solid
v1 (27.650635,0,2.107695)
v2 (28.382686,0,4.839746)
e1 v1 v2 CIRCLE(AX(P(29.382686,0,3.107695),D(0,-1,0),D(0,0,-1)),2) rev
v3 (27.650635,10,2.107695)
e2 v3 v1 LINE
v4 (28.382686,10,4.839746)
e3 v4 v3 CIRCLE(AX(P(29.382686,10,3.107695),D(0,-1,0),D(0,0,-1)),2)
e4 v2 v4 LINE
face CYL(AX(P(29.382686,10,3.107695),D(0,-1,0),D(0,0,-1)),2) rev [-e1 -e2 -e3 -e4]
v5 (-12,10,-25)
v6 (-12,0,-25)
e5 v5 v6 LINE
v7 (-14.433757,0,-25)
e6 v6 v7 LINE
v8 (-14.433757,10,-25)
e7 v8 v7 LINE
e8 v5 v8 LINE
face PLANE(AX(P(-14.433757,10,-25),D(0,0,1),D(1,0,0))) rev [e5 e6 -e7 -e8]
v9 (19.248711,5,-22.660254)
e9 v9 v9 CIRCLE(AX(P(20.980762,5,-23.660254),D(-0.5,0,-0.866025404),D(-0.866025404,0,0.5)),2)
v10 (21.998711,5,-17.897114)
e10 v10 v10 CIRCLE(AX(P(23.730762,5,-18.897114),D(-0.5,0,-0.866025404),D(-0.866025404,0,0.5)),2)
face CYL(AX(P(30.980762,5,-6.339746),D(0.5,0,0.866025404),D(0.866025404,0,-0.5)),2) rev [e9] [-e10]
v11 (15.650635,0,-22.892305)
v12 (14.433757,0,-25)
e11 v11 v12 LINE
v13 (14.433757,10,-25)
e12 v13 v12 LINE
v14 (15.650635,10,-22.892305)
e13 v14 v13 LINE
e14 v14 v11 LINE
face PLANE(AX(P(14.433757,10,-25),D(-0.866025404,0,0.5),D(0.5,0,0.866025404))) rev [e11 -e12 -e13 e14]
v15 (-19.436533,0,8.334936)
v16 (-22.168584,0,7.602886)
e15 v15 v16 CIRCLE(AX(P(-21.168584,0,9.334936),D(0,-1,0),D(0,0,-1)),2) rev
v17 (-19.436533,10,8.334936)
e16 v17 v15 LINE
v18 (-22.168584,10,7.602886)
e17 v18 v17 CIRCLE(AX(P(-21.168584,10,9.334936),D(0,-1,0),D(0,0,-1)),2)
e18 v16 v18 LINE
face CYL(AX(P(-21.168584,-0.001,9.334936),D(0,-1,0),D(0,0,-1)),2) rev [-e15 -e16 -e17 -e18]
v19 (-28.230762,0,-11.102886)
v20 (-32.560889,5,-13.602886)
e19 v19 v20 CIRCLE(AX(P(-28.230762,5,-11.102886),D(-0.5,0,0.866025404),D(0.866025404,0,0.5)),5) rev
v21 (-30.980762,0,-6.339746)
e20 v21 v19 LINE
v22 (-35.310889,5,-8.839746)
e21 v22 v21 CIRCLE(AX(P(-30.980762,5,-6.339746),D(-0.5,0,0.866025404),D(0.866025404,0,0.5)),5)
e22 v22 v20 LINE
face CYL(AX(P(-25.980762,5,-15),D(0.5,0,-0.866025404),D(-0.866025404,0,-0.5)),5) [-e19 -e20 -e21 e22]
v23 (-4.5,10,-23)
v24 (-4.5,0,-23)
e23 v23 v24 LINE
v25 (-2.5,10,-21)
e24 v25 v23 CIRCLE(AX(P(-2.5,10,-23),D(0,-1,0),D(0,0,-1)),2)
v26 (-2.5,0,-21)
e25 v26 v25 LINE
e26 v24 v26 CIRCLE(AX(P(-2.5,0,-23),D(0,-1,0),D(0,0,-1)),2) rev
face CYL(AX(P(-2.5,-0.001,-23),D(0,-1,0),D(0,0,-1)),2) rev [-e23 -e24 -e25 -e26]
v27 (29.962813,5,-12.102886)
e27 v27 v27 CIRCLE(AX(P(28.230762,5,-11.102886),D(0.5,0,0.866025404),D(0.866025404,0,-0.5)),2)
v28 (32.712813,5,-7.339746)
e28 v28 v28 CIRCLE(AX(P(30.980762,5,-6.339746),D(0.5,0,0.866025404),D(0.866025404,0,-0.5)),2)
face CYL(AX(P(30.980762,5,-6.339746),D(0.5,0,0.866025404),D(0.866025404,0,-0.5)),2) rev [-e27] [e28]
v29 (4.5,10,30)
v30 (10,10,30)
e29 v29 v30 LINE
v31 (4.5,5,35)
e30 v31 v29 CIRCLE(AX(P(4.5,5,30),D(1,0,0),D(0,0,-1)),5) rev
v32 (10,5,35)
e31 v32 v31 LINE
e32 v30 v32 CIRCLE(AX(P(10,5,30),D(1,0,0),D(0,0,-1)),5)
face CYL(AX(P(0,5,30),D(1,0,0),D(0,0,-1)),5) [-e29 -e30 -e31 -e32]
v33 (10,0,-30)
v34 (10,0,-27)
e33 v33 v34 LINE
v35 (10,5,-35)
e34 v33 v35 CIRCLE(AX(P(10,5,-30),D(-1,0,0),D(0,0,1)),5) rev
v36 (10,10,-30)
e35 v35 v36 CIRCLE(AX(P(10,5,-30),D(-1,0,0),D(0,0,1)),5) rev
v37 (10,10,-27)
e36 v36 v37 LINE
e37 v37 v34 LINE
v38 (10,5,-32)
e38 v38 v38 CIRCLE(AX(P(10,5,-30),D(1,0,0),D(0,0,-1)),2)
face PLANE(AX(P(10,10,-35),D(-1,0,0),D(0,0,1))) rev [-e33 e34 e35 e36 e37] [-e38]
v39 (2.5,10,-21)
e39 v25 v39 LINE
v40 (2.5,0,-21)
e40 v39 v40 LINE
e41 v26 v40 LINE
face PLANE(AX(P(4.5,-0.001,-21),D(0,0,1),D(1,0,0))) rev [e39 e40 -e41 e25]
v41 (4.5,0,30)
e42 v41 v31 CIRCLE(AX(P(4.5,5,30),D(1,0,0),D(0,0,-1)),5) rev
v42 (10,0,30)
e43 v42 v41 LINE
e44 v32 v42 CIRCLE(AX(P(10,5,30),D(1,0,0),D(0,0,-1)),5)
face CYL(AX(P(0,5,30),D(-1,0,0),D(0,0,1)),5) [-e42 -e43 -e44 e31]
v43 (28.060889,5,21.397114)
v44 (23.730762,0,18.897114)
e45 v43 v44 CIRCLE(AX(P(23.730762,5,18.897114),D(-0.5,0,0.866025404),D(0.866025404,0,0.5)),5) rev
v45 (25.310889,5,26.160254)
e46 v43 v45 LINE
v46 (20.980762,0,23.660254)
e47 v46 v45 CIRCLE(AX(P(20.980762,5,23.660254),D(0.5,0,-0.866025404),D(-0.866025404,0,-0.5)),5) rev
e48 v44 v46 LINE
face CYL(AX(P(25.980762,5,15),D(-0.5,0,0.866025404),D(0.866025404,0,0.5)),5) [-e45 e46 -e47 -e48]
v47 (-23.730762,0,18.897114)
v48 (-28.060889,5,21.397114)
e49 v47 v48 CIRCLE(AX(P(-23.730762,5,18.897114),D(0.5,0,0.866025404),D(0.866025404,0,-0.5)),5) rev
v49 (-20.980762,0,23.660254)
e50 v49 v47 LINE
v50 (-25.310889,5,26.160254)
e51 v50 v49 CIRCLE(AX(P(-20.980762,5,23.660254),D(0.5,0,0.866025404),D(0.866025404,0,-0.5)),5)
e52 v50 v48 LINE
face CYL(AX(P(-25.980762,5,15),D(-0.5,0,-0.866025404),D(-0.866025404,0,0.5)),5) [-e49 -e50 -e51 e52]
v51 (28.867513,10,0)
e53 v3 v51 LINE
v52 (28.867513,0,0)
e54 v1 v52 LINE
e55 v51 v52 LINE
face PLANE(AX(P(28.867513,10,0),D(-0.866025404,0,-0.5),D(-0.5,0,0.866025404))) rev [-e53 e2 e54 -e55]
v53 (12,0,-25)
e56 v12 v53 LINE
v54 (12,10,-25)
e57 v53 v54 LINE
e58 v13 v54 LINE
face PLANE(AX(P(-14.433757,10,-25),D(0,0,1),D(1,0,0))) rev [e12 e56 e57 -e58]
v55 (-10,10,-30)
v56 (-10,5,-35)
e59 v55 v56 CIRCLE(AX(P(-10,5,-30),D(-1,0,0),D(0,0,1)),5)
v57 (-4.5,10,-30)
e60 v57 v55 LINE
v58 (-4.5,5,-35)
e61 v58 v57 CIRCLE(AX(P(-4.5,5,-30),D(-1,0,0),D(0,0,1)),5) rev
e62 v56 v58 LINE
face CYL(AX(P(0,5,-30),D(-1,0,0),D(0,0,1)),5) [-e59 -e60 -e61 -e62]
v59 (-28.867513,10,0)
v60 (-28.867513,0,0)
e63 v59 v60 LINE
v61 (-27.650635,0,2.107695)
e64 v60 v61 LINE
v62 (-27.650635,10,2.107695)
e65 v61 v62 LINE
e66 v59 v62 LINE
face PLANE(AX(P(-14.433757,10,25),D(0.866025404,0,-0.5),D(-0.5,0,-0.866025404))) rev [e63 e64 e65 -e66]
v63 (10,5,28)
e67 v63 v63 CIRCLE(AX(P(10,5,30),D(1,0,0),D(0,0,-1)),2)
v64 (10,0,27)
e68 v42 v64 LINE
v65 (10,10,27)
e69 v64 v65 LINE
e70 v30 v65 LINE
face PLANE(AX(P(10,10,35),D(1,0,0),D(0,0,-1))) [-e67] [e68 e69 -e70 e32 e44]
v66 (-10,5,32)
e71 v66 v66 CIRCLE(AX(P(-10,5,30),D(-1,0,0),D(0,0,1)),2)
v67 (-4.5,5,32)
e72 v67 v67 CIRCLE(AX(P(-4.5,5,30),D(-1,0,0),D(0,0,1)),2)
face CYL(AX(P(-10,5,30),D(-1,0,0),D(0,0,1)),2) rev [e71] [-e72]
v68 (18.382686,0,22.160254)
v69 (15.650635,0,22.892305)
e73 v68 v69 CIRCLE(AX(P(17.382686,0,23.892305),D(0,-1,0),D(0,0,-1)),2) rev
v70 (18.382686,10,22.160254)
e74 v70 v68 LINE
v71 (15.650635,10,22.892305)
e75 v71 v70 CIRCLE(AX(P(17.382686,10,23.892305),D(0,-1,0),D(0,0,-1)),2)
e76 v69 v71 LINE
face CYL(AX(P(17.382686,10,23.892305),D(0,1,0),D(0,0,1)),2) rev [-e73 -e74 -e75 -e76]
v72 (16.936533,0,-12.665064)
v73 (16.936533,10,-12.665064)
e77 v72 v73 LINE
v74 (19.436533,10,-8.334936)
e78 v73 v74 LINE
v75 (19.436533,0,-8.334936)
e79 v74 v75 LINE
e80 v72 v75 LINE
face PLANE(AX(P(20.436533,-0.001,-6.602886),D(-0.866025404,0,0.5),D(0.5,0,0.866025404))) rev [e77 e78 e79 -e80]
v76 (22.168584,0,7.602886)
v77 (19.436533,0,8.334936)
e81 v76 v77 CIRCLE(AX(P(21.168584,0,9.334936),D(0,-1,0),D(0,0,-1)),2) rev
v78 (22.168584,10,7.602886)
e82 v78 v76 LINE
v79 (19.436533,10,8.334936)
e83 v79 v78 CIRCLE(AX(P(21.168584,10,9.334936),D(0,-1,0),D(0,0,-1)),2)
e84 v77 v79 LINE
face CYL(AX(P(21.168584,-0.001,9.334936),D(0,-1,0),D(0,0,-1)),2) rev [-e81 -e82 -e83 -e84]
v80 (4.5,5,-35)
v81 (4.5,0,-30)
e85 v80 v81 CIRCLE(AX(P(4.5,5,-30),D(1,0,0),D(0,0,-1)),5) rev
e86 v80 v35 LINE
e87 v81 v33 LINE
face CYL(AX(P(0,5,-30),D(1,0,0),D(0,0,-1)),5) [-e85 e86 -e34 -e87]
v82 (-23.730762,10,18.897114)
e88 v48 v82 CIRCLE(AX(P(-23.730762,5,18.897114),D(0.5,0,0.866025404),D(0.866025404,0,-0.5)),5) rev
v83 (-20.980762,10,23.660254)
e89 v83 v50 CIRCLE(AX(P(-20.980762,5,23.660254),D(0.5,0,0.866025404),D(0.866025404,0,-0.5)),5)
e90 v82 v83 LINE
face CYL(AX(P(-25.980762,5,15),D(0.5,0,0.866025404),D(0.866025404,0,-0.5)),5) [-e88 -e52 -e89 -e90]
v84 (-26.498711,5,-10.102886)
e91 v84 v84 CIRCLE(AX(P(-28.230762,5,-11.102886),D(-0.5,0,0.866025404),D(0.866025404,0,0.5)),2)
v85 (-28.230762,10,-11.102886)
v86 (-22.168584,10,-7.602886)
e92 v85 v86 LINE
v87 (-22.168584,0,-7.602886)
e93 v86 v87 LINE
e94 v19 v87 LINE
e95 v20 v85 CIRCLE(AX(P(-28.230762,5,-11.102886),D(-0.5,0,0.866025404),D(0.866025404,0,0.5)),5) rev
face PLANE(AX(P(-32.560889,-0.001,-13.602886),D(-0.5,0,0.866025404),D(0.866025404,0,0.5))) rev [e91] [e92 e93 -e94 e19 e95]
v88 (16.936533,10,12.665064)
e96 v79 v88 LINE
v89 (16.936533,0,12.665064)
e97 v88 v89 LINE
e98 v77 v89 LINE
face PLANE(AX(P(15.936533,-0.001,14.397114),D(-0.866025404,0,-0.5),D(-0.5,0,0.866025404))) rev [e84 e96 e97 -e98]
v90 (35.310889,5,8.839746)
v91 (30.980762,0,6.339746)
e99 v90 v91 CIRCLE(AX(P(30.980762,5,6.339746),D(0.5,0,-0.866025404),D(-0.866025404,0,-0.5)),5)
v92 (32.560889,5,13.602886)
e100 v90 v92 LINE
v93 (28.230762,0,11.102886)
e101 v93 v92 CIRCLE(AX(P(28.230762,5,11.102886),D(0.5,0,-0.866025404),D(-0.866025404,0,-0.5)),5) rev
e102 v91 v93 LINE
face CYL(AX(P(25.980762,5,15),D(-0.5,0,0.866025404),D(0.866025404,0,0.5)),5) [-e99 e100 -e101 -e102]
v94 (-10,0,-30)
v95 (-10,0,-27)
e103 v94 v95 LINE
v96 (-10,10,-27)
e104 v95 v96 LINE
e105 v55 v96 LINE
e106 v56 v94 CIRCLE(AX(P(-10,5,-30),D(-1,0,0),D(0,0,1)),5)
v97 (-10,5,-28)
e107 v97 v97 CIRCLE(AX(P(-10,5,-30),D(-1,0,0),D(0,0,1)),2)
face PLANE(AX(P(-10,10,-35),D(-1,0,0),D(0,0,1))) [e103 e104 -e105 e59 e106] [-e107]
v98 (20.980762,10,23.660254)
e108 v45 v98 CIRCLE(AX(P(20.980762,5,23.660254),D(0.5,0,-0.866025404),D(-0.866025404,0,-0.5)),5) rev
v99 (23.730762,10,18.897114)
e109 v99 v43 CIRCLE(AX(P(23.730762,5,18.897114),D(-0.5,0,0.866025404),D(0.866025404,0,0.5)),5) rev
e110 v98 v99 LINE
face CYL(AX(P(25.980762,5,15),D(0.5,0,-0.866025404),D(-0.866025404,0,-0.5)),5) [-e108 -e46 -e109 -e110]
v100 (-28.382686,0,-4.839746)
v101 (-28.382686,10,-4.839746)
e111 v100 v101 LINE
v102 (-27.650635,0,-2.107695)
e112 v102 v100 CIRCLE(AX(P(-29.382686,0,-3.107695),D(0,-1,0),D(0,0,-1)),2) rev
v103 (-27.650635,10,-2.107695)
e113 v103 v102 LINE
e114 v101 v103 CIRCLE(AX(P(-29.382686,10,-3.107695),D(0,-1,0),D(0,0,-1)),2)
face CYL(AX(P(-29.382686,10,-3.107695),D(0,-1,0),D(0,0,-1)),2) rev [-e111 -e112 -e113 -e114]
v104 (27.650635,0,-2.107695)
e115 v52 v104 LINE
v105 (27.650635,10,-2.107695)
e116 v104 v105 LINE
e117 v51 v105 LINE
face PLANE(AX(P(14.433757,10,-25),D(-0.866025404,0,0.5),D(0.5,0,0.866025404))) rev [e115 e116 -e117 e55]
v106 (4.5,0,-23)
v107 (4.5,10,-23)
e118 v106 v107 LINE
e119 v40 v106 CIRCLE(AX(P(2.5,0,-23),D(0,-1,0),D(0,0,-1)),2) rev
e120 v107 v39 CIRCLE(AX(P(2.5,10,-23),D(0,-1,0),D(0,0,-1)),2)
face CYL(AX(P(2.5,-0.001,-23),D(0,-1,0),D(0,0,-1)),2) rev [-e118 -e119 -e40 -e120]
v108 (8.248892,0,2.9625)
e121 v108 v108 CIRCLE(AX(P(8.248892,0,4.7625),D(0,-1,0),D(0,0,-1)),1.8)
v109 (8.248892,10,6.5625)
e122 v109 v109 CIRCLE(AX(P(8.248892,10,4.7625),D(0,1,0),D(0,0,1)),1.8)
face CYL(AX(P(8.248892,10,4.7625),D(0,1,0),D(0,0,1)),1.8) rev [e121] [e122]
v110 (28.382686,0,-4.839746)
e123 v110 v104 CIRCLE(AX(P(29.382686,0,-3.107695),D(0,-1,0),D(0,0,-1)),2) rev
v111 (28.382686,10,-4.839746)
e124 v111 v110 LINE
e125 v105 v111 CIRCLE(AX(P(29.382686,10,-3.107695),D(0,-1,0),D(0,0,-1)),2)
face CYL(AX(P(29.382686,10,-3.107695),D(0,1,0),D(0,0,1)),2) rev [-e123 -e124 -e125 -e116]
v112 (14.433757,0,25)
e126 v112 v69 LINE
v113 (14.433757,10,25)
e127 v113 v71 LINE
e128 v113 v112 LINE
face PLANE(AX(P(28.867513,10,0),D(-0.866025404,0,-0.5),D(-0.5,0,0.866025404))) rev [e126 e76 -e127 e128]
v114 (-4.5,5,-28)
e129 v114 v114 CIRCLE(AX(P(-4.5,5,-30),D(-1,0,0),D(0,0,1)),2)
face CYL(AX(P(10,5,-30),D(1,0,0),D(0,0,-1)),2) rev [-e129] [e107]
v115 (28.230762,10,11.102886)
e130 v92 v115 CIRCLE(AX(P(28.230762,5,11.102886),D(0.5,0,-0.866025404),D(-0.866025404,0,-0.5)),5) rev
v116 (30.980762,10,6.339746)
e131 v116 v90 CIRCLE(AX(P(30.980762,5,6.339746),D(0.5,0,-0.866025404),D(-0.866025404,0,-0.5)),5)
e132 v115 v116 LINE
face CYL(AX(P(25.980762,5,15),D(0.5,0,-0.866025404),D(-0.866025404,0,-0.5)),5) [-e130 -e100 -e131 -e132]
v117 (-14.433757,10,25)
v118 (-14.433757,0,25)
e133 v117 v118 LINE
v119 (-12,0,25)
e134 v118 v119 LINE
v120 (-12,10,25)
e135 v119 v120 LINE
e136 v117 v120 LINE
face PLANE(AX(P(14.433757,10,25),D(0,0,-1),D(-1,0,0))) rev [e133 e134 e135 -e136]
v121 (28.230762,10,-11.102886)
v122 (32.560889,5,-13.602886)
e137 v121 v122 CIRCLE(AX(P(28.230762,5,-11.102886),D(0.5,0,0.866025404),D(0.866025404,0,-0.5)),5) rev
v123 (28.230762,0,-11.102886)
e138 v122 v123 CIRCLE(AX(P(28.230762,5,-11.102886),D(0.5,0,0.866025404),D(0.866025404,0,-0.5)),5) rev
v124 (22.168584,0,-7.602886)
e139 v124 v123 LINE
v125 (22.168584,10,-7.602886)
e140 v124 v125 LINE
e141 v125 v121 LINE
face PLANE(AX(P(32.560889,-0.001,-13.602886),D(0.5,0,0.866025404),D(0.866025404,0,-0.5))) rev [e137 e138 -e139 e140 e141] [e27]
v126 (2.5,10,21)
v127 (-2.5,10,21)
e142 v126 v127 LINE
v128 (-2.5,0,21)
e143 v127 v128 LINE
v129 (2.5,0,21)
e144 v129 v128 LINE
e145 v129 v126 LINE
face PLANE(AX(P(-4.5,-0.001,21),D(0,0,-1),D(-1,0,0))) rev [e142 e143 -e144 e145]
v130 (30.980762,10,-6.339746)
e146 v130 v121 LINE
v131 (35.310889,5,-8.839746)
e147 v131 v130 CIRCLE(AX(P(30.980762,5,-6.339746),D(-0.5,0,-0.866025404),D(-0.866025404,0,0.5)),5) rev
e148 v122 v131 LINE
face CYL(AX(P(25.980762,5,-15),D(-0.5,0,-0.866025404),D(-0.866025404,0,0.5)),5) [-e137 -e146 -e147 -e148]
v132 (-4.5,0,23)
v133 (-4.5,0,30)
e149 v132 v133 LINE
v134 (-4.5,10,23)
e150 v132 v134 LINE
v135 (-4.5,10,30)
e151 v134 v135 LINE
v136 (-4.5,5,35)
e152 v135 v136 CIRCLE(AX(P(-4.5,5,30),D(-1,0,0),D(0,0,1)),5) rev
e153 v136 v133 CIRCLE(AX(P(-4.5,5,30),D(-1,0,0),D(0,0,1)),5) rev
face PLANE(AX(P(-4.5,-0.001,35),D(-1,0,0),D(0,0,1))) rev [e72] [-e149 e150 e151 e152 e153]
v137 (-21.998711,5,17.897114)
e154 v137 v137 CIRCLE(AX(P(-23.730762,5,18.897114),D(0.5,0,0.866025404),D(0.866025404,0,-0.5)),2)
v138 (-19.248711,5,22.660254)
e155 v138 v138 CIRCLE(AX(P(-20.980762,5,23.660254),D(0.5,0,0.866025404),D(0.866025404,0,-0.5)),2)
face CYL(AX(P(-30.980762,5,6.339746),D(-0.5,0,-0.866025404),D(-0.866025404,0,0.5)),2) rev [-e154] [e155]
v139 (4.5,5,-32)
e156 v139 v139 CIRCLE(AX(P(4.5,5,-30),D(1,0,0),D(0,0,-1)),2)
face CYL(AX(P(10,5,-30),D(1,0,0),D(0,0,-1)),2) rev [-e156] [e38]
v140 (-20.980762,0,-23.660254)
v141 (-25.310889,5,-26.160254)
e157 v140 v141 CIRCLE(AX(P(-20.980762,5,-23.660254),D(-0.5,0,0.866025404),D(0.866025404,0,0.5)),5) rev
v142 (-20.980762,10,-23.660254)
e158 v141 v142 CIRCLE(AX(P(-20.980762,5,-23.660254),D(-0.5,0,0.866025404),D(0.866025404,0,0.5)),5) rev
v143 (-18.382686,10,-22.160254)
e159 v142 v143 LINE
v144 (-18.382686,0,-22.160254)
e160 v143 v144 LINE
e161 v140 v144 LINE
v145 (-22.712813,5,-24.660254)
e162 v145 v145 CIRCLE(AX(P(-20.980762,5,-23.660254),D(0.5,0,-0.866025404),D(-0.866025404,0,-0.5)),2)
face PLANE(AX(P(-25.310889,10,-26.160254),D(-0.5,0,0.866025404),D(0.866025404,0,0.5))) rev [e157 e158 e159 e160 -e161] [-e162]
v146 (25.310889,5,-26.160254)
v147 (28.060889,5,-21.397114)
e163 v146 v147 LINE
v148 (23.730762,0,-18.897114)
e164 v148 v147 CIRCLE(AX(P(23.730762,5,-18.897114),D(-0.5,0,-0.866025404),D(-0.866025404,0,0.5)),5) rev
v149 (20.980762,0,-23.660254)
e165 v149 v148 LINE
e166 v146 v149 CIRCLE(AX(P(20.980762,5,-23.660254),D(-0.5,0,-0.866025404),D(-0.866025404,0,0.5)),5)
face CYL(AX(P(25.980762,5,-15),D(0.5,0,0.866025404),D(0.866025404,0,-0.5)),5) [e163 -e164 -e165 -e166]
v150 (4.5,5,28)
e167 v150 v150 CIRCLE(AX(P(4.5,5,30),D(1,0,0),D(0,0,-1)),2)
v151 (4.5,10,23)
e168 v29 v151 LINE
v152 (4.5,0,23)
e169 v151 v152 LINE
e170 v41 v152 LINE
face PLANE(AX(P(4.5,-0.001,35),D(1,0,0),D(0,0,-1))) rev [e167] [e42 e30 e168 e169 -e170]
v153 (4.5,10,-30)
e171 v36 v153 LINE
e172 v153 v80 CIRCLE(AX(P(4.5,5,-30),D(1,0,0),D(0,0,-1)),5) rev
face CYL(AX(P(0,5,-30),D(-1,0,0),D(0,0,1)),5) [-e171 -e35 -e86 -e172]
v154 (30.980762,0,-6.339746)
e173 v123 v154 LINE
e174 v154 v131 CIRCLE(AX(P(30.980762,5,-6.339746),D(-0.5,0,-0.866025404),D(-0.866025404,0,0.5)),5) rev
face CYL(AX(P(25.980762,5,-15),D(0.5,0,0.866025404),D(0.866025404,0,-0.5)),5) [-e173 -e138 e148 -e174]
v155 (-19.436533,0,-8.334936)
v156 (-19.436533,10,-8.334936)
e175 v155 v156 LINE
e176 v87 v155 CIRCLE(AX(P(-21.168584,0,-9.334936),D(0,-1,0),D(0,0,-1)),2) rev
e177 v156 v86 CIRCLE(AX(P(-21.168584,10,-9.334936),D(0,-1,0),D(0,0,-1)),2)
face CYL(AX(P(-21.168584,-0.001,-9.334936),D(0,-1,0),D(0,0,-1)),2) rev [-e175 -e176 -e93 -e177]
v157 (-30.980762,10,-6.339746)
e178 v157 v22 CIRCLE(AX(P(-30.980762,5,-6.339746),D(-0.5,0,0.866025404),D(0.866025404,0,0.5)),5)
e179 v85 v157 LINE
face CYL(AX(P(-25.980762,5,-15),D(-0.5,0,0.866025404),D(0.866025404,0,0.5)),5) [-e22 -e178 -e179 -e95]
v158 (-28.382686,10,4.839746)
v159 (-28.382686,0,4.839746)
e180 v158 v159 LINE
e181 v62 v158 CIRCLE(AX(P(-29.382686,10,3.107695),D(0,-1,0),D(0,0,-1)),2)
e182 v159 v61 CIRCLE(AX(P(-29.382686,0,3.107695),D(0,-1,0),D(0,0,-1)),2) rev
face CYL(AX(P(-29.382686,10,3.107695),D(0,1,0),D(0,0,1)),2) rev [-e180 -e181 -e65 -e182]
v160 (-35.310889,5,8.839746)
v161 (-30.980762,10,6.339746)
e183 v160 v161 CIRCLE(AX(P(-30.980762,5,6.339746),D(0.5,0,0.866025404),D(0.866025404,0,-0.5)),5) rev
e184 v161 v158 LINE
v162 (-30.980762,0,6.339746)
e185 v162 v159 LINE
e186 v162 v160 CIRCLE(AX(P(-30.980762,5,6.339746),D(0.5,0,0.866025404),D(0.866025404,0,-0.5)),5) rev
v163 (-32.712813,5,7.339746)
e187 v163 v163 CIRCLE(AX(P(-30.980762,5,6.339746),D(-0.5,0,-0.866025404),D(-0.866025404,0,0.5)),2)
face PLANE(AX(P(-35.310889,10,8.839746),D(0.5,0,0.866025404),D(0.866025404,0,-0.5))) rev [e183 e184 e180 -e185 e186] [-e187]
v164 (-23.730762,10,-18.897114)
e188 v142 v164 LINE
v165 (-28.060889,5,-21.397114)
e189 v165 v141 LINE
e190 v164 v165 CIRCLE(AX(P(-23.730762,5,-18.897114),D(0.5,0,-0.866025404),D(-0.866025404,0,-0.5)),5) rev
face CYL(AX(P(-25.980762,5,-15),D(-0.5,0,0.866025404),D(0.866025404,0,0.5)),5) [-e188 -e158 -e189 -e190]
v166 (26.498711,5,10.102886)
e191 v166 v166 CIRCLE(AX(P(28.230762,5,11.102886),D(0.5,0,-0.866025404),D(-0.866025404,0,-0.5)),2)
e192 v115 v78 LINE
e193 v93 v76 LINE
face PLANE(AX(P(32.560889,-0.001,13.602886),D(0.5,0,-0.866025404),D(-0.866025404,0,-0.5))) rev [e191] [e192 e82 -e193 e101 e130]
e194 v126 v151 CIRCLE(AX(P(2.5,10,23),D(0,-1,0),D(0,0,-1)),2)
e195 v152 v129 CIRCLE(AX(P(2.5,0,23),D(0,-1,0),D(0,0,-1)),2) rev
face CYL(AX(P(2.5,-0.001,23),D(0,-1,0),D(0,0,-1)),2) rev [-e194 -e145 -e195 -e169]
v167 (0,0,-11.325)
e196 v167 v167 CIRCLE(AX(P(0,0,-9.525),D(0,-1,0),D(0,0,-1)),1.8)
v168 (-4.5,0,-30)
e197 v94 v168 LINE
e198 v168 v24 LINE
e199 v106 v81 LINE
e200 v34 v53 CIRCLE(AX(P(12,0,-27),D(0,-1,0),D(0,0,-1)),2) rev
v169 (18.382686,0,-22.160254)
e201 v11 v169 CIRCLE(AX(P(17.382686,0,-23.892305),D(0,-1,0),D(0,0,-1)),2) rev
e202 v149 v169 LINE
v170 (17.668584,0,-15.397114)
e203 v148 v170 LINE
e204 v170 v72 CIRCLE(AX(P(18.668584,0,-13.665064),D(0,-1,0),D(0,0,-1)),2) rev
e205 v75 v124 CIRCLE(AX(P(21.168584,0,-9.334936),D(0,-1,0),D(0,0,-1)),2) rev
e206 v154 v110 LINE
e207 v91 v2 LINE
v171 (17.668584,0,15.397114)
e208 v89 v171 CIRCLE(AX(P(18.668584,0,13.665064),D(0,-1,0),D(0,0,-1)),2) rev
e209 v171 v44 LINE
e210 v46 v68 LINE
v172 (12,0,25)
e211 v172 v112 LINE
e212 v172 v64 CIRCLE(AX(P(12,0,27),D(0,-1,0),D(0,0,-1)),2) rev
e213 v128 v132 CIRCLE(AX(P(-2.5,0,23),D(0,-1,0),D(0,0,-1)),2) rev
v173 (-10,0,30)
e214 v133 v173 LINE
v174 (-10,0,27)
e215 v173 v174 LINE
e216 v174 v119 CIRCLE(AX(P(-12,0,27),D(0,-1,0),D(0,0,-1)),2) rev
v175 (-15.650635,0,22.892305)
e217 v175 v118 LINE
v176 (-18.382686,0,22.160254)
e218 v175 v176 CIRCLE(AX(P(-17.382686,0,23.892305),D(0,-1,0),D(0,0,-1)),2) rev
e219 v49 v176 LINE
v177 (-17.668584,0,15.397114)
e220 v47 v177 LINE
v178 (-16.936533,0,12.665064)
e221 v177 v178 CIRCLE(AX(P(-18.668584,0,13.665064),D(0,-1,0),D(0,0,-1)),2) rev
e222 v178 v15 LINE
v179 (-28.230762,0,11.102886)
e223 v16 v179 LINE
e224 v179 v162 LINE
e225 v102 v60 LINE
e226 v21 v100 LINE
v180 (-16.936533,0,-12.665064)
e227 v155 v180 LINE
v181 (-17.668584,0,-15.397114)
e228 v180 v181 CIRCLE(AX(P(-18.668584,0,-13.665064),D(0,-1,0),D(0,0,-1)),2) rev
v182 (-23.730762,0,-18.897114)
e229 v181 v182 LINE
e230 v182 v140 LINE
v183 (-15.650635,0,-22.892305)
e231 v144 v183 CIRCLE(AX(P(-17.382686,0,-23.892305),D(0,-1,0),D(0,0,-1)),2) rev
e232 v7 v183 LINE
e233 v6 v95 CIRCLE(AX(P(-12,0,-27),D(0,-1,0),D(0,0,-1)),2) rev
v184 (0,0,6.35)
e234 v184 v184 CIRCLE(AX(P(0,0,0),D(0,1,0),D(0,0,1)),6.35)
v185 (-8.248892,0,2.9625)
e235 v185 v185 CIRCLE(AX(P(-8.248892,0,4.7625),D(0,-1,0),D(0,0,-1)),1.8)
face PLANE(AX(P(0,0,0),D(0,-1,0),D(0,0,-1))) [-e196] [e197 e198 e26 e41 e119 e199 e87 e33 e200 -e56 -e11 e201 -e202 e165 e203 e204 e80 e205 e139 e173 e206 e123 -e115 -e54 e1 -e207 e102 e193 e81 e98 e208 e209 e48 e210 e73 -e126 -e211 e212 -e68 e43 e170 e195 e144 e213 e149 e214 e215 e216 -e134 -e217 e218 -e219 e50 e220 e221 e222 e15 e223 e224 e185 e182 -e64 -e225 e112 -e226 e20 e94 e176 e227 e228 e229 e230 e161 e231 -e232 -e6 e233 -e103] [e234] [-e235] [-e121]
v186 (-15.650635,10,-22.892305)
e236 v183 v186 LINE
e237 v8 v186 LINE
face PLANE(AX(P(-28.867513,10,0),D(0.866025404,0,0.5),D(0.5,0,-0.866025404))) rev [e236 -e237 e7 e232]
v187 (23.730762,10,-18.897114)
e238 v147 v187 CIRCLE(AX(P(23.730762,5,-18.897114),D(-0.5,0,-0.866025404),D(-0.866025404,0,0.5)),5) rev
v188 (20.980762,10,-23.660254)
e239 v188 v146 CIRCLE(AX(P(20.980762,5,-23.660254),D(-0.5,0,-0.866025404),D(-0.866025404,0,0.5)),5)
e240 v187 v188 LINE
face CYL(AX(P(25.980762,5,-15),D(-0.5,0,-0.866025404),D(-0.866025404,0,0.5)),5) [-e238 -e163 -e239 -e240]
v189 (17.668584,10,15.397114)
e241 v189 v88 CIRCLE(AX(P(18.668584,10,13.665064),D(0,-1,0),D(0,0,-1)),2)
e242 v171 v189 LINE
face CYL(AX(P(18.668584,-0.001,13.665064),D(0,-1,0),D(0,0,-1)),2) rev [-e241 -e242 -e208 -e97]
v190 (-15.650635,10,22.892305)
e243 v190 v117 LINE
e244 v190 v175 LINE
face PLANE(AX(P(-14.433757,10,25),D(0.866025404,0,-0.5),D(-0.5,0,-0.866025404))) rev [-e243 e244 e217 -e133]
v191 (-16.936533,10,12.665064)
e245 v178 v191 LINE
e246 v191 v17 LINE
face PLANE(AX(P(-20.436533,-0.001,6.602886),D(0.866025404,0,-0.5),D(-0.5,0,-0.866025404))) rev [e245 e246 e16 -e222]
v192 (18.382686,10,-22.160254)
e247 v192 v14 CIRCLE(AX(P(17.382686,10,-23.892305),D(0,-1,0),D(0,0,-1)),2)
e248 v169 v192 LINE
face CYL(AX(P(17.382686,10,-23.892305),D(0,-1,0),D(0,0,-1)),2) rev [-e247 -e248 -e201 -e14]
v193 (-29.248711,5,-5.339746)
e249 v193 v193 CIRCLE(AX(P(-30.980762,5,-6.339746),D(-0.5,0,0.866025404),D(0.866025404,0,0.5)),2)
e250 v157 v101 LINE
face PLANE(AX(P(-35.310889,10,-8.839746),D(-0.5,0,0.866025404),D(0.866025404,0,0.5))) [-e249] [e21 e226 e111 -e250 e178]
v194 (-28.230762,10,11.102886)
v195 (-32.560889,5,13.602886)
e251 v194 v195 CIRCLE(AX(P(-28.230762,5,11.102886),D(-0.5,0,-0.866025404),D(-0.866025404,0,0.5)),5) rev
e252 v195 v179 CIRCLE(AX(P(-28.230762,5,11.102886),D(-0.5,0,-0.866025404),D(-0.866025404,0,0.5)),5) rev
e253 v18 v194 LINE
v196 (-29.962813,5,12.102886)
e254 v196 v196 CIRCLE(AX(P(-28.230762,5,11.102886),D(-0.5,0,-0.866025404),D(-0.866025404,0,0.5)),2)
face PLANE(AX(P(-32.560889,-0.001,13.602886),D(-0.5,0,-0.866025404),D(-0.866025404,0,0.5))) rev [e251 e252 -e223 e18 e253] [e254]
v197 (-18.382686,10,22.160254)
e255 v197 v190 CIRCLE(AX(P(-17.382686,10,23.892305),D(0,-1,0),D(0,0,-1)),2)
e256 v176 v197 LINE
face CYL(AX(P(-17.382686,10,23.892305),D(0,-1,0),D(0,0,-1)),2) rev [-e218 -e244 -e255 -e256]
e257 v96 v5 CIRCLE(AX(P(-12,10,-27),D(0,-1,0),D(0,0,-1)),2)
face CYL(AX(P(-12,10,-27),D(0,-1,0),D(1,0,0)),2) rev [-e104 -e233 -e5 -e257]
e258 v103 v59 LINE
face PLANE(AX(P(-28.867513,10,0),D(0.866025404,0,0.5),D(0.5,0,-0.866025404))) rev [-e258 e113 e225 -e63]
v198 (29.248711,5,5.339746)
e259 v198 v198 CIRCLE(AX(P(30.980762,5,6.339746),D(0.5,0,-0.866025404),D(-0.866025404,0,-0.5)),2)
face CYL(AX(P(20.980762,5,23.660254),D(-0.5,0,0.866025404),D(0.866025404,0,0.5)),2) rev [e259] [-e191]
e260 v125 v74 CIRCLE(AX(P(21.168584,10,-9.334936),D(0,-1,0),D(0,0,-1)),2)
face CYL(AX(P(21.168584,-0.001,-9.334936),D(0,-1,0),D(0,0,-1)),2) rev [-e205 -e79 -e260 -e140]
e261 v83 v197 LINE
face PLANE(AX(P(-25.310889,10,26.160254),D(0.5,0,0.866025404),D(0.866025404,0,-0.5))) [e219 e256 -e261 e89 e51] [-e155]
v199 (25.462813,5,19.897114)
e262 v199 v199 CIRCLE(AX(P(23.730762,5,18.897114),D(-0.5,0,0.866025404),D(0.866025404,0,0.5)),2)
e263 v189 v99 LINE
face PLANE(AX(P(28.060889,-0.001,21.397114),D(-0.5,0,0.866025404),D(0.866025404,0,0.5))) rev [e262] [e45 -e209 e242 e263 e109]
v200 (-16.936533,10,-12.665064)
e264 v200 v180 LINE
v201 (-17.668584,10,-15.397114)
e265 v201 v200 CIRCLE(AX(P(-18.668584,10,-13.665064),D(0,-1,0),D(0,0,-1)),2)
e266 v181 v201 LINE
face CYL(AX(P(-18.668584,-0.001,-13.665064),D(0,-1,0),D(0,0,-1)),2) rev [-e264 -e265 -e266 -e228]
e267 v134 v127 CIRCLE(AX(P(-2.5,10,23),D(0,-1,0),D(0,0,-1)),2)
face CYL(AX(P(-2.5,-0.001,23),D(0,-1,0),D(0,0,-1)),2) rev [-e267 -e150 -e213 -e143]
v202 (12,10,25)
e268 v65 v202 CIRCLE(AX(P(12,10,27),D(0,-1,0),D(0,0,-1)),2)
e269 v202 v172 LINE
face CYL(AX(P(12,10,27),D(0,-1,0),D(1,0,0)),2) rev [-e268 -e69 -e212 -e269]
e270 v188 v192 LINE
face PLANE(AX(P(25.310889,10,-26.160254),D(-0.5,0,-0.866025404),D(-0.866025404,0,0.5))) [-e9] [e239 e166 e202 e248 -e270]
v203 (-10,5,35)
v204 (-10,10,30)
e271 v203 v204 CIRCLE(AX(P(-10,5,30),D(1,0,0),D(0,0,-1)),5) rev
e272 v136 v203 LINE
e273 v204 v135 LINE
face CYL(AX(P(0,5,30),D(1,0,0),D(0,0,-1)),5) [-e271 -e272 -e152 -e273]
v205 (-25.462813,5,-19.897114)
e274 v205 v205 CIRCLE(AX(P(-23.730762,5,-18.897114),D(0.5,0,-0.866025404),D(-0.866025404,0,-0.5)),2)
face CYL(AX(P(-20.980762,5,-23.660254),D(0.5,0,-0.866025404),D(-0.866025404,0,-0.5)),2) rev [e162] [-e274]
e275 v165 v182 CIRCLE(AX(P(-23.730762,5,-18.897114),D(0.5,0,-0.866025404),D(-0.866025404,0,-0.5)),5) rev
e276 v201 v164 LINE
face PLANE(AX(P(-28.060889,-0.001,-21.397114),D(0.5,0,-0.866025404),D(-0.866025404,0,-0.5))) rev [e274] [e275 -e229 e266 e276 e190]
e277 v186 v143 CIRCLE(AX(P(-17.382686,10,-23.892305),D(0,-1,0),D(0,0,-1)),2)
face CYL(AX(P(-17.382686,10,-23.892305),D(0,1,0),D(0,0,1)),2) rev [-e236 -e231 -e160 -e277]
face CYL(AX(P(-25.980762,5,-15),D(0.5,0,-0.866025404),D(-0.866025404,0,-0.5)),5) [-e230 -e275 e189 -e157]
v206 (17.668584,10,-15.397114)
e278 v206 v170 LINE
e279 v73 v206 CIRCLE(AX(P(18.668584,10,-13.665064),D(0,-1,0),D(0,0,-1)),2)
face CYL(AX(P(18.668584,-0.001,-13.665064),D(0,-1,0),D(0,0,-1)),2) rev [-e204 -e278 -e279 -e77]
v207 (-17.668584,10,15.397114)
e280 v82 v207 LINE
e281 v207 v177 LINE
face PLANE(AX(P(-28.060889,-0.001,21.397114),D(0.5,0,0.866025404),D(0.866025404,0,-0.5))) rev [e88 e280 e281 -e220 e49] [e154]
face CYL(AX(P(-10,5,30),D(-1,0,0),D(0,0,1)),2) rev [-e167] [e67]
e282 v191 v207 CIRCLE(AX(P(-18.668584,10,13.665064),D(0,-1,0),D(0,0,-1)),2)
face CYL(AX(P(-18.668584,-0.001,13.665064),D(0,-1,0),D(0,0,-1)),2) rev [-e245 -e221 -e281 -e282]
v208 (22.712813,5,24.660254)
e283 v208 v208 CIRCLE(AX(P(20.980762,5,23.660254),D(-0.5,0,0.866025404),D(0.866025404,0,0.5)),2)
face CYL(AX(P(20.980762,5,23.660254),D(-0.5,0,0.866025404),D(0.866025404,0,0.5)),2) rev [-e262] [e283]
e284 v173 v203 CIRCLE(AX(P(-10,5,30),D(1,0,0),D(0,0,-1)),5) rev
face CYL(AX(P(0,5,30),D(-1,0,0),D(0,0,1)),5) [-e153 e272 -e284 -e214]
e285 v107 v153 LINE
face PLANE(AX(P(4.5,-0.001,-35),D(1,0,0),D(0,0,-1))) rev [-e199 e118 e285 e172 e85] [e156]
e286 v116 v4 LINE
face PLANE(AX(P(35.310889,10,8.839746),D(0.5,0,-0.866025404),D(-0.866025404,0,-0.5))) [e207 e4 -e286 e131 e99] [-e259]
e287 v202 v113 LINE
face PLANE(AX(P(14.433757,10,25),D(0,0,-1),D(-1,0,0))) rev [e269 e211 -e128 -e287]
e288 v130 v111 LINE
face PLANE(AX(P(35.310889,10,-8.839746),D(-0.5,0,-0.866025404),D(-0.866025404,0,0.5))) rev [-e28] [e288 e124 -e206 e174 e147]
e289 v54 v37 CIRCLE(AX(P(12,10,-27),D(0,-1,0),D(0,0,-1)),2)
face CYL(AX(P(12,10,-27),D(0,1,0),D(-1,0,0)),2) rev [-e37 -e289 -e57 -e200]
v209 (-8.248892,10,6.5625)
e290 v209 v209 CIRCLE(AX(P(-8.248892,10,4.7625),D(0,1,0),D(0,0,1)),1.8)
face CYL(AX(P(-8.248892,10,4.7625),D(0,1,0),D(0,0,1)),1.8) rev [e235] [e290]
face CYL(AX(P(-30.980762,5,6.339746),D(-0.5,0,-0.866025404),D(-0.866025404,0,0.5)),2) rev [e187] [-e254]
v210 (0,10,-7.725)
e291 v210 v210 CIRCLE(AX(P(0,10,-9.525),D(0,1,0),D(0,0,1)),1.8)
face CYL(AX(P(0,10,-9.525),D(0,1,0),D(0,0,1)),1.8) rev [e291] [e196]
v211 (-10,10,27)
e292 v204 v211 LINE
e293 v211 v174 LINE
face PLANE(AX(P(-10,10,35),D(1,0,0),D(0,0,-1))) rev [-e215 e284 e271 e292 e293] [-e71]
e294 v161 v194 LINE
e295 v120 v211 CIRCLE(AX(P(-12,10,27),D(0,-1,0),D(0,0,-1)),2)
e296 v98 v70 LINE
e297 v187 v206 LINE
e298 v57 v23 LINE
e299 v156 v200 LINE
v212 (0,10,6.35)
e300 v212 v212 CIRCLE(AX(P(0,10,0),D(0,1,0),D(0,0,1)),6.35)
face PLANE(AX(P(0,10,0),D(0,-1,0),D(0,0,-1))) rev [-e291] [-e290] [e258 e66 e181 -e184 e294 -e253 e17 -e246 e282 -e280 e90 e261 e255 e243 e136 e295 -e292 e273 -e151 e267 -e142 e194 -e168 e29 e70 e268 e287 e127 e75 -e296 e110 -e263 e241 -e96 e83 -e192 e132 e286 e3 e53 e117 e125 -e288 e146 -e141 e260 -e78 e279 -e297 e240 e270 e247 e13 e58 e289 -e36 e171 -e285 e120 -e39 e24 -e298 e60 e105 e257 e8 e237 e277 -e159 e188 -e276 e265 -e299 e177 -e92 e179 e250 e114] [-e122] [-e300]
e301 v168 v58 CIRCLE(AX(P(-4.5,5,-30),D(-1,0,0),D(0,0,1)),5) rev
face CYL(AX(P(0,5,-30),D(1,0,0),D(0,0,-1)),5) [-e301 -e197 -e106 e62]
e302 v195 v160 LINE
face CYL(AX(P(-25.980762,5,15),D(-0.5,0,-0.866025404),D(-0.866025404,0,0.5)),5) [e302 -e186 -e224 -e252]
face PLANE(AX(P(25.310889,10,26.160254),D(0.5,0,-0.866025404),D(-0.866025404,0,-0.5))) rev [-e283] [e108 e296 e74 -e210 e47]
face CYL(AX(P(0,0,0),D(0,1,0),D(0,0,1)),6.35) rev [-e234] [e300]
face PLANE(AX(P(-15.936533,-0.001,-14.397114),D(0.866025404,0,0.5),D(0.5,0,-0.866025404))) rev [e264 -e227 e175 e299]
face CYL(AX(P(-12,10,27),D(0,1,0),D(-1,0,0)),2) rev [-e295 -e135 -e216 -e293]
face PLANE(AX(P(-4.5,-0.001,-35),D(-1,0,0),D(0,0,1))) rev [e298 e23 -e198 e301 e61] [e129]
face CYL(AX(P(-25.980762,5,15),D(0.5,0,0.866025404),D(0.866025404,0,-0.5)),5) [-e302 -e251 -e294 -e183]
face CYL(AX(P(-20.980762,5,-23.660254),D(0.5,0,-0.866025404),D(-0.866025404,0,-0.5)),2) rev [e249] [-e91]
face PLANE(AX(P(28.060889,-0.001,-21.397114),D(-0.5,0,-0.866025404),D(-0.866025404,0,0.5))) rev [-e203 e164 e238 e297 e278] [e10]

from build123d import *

# Parameters (mm, degrees)
BOSS_EXTRUDE1_DEPTH      = 10
BOSS_EXTRUDE2_DEPTH      = 10
CUT_EXTRUDE1_REACH       = 47.069
FILLET1_R                = 5
F_4_0_MM_DOWEL_HOLES1_D  = 4
CIRPATTERN5_COUNT        = 6
FILLET1_OF_CIRPATTERN5_R = 5
FILLET2_R                = 2
SKETCH6_R                = 6.35
CUT_EXTRUDE2_DEPTH       = 51.71349811760731
M3_CLEARANCE_HOLE1_D     = 3.6
CIRPATTERN6_COUNT        = 3


with BuildPart() as part:
    # Sketch1 → Boss-Extrude1 (new body)
    with BuildSketch(Plane(origin=(0, 0, 0), x_dir=(1, 0, 0), z_dir=(0, 1, 0))):
        Polygon((-28.867513459481238, 4.38e-15), (-14.43375672974066, 25.000000000000057), (14.433756729740656, 25.000000000000057), (28.867513459481245, 6.61e-15), (14.433756729740656, -25.00000000000005), (-14.433756729740653, -25.00000000000005), align=None)
    extrude(amount=BOSS_EXTRUDE1_DEPTH)

    # Sketch2 → Boss-Extrude2 (add)
    with BuildSketch(Plane(origin=(21.650635094611008, 0, 12.49999999999995), x_dir=(0.49999999999999784, 0, -0.86602540378444), z_dir=(0.86602540378444, 0, 0.49999999999999784))):
        Polygon((-10.000000000000002, 10), (9.999999999999998, 10.000000000000004), (10, 3.67e-15), (-10, 0), align=None)
    boss_extrude2 = extrude(amount=BOSS_EXTRUDE2_DEPTH)

    # Sketch3 → Cut-Extrude1 (cut, up to next)
    with BuildSketch(Plane(origin=(0, 10, 0), x_dir=(1, 0, 0), z_dir=(0, 1, 0)), mode=Mode.PRIVATE) as cut_extrude1_sk1:
        Polygon((28.060889132455394, -21.397114317029995), (32.56088913245539, -13.602885682970053), (20.436533479473244, -6.602885682970054), (15.936533479473251, -14.39711431702999), align=None)
    cut_extrude1_tool1 = extrude(cut_extrude1_sk1.sketch, amount=-CUT_EXTRUDE1_REACH, mode=Mode.PRIVATE) & part.part
    cut_extrude1 = cut_extrude1_tool1.solids().sort_by_distance((24.248711, 10, 14))[0]
    add(cut_extrude1, mode=Mode.SUBTRACT)

    # Fillet1
    fillet1_edges = [part.edges().sort_by_distance(p)[0] for p in [
        (26.6858891324554, 5.1e-16, 23.778684177437157),
        (26.6858891324554, 10, 23.778684177437157),
        (33.935889132455365, 3.17e-15, 11.22131582256278),
        (33.935889132455365, 10.000000000000004, 11.22131582256278),
    ]]
    fillet(fillet1_edges, radius=FILLET1_R - 0.0001)  # a hair under: the kernel refuses the full size

    # Ø4.0 mm Dowel Holes1 (through all)
    with Locations(Plane(origin=(-4.999999999999981, -4.74e-15, 8.660254037844405), x_dir=(0.8660254037844399, 0, 0.4999999999999979), z_dir=(-0.49999999999999784, 0, 0.8660254037844398))):
        with Locations((30, 5)):
            f_4_0_mm_dowel_holes1 = Hole(F_4_0_MM_DOWEL_HOLES1_D / 2)

    # CirPattern5: Boss-Extrude2, Cut-Extrude1, Ø4.0 mm Dowel Holes1 ×6 about axis
    cirpattern5_axis = Axis((-8.6e-16, 0, -9.3e-16), (0, 1, 0))
    add([boss_extrude2.rotate(cirpattern5_axis, i * 360 / CIRPATTERN5_COUNT) for i in range(1, CIRPATTERN5_COUNT)])
    add([cut_extrude1.rotate(cirpattern5_axis, i * 360 / CIRPATTERN5_COUNT) for i in range(1, CIRPATTERN5_COUNT)], mode=Mode.SUBTRACT)
    add([f_4_0_mm_dowel_holes1.rotate(cirpattern5_axis, i * 360 / CIRPATTERN5_COUNT) for i in range(1, CIRPATTERN5_COUNT)], mode=Mode.SUBTRACT)

    # Fillet1 of CirPattern5
    fillet1_of_cirpattern5_edges = [part.edges().sort_by_distance(p)[0] for p in [
        (33.93588913245536, 5.1e-16, -11.221315822562872),
        (33.93588913245536, 10, -11.221315822562872),
        (26.685889132455333, 3.17e-15, -23.77868417743721),
        (26.68588913245533, 10.000000000000004, -23.778684177437214),
        (7.24999999999996, 5.1e-16, -35.00000000000003),
        (7.249999999999962, 10, -35.00000000000003),
        (-7.250000000000035, 3.17e-15, -35),
        (-7.250000000000035, 10.000000000000004, -35),
        (-26.6858891324554, 5.1e-16, -23.778684177437164),
        (-26.6858891324554, 10, -23.778684177437164),
        (-33.935889132455365, 3.17e-15, -11.221315822562786),
        (-33.935889132455365, 10.000000000000004, -11.221315822562786),
        (-33.93588913245536, 5.1e-16, 11.221315822562858),
        (-33.935889132455365, 10, 11.221315822562856),
        (-26.685889132455337, 3.17e-15, 23.7786841774372),
        (-26.685889132455337, 10.000000000000004, 23.7786841774372),
        (-7.249999999999951, 5.1e-16, 35.000000000000036),
        (-7.249999999999951, 10, 35.000000000000036),
        (7.250000000000045, 3.17e-15, 34.99999999999999),
        (7.2500000000000435, 10.000000000000004, 34.99999999999999),
    ]]
    fillet(fillet1_of_cirpattern5_edges, radius=FILLET1_OF_CIRPATTERN5_R - 0.0001)  # a hair under: the kernel refuses the full size

    # Fillet2
    fillet2_edges = [part.edges().sort_by_distance(p)[0] for p in [
        (-10.00000000000006, 5.0000000000000036, -24.99999999999999),
        (-16.65063509461103, 5, -21.160254037844354),
        (-26.650635094610987, 5.0000000000000036, -3.839745962155554),
        (-26.65063509461097, 5, 3.839745962155675),
        (-16.650635094610934, 5.0000000000000036, 21.160254037844428),
        (-9.999999999999936, 5, 25.000000000000043),
        (10.000000000000064, 5.0000000000000036, 24.999999999999986),
        (20.436533479473248, 5, -6.602885682970051),
        (15.936533479473255, 5, -14.39711431702999),
        (4.499999999999998, 5, -21.000000000000046),
        (-4.499999999999988, 5, -21.00000000000005),
        (-15.936533479473251, 5, -14.397114317029994),
        (-20.436533479473244, 5, -6.602885682970059),
        (-20.43653347947325, 5, 6.602885682970041),
        (-15.93653347947326, 5, 14.397114317029978),
        (-4.499999999999992, 5, 21.000000000000043),
        (4.499999999999993, 5, 21.000000000000043),
        (16.65063509461103, 5, 21.16025403784435),
        (26.650635094610987, 5.0000000000000036, 3.8397459621555505),
        (15.936533479473251, 5, 14.39711431702999),
        (20.436533479473244, 5, 6.602885682970054),
        (26.65063509461097, 5, -3.8397459621556855),
        (16.650635094610927, 5.0000000000000036, -21.160254037844435),
        (9.999999999999943, 5, -25.00000000000004),
    ]]
    fillet(fillet2_edges, radius=FILLET2_R)

    # Sketch6 → Cut-Extrude2 (cut, through all)
    with BuildSketch(Plane(origin=(0, 10, 0), x_dir=(1, 0, 0), z_dir=(0, 1, 0))):
        with Locations(Location((0, 0, 0), (0, 0, 270))):
            Circle(SKETCH6_R)
    extrude(amount=-CUT_EXTRUDE2_DEPTH, mode=Mode.SUBTRACT)

    # M3 Clearance Hole1 (through all)
    with Locations(Plane(origin=(0, 10, 0), x_dir=(1, 0, 0), z_dir=(0, 1, 0))):
        with Locations((0, 9.525)):
            m3_clearance_hole1 = Hole(M3_CLEARANCE_HOLE1_D / 2)

    # CirPattern6: M3 Clearance Hole1 ×3 about axis
    cirpattern6_axis = Axis((-3.1e-16, 0, 4.7e-16), (0, 1, 0))
    for i in range(1, CIRPATTERN6_COUNT):
        add(m3_clearance_hole1.rotate(cirpattern6_axis, i * 360 / CIRPATTERN6_COUNT), mode=Mode.SUBTRACT)


solid = part.part
